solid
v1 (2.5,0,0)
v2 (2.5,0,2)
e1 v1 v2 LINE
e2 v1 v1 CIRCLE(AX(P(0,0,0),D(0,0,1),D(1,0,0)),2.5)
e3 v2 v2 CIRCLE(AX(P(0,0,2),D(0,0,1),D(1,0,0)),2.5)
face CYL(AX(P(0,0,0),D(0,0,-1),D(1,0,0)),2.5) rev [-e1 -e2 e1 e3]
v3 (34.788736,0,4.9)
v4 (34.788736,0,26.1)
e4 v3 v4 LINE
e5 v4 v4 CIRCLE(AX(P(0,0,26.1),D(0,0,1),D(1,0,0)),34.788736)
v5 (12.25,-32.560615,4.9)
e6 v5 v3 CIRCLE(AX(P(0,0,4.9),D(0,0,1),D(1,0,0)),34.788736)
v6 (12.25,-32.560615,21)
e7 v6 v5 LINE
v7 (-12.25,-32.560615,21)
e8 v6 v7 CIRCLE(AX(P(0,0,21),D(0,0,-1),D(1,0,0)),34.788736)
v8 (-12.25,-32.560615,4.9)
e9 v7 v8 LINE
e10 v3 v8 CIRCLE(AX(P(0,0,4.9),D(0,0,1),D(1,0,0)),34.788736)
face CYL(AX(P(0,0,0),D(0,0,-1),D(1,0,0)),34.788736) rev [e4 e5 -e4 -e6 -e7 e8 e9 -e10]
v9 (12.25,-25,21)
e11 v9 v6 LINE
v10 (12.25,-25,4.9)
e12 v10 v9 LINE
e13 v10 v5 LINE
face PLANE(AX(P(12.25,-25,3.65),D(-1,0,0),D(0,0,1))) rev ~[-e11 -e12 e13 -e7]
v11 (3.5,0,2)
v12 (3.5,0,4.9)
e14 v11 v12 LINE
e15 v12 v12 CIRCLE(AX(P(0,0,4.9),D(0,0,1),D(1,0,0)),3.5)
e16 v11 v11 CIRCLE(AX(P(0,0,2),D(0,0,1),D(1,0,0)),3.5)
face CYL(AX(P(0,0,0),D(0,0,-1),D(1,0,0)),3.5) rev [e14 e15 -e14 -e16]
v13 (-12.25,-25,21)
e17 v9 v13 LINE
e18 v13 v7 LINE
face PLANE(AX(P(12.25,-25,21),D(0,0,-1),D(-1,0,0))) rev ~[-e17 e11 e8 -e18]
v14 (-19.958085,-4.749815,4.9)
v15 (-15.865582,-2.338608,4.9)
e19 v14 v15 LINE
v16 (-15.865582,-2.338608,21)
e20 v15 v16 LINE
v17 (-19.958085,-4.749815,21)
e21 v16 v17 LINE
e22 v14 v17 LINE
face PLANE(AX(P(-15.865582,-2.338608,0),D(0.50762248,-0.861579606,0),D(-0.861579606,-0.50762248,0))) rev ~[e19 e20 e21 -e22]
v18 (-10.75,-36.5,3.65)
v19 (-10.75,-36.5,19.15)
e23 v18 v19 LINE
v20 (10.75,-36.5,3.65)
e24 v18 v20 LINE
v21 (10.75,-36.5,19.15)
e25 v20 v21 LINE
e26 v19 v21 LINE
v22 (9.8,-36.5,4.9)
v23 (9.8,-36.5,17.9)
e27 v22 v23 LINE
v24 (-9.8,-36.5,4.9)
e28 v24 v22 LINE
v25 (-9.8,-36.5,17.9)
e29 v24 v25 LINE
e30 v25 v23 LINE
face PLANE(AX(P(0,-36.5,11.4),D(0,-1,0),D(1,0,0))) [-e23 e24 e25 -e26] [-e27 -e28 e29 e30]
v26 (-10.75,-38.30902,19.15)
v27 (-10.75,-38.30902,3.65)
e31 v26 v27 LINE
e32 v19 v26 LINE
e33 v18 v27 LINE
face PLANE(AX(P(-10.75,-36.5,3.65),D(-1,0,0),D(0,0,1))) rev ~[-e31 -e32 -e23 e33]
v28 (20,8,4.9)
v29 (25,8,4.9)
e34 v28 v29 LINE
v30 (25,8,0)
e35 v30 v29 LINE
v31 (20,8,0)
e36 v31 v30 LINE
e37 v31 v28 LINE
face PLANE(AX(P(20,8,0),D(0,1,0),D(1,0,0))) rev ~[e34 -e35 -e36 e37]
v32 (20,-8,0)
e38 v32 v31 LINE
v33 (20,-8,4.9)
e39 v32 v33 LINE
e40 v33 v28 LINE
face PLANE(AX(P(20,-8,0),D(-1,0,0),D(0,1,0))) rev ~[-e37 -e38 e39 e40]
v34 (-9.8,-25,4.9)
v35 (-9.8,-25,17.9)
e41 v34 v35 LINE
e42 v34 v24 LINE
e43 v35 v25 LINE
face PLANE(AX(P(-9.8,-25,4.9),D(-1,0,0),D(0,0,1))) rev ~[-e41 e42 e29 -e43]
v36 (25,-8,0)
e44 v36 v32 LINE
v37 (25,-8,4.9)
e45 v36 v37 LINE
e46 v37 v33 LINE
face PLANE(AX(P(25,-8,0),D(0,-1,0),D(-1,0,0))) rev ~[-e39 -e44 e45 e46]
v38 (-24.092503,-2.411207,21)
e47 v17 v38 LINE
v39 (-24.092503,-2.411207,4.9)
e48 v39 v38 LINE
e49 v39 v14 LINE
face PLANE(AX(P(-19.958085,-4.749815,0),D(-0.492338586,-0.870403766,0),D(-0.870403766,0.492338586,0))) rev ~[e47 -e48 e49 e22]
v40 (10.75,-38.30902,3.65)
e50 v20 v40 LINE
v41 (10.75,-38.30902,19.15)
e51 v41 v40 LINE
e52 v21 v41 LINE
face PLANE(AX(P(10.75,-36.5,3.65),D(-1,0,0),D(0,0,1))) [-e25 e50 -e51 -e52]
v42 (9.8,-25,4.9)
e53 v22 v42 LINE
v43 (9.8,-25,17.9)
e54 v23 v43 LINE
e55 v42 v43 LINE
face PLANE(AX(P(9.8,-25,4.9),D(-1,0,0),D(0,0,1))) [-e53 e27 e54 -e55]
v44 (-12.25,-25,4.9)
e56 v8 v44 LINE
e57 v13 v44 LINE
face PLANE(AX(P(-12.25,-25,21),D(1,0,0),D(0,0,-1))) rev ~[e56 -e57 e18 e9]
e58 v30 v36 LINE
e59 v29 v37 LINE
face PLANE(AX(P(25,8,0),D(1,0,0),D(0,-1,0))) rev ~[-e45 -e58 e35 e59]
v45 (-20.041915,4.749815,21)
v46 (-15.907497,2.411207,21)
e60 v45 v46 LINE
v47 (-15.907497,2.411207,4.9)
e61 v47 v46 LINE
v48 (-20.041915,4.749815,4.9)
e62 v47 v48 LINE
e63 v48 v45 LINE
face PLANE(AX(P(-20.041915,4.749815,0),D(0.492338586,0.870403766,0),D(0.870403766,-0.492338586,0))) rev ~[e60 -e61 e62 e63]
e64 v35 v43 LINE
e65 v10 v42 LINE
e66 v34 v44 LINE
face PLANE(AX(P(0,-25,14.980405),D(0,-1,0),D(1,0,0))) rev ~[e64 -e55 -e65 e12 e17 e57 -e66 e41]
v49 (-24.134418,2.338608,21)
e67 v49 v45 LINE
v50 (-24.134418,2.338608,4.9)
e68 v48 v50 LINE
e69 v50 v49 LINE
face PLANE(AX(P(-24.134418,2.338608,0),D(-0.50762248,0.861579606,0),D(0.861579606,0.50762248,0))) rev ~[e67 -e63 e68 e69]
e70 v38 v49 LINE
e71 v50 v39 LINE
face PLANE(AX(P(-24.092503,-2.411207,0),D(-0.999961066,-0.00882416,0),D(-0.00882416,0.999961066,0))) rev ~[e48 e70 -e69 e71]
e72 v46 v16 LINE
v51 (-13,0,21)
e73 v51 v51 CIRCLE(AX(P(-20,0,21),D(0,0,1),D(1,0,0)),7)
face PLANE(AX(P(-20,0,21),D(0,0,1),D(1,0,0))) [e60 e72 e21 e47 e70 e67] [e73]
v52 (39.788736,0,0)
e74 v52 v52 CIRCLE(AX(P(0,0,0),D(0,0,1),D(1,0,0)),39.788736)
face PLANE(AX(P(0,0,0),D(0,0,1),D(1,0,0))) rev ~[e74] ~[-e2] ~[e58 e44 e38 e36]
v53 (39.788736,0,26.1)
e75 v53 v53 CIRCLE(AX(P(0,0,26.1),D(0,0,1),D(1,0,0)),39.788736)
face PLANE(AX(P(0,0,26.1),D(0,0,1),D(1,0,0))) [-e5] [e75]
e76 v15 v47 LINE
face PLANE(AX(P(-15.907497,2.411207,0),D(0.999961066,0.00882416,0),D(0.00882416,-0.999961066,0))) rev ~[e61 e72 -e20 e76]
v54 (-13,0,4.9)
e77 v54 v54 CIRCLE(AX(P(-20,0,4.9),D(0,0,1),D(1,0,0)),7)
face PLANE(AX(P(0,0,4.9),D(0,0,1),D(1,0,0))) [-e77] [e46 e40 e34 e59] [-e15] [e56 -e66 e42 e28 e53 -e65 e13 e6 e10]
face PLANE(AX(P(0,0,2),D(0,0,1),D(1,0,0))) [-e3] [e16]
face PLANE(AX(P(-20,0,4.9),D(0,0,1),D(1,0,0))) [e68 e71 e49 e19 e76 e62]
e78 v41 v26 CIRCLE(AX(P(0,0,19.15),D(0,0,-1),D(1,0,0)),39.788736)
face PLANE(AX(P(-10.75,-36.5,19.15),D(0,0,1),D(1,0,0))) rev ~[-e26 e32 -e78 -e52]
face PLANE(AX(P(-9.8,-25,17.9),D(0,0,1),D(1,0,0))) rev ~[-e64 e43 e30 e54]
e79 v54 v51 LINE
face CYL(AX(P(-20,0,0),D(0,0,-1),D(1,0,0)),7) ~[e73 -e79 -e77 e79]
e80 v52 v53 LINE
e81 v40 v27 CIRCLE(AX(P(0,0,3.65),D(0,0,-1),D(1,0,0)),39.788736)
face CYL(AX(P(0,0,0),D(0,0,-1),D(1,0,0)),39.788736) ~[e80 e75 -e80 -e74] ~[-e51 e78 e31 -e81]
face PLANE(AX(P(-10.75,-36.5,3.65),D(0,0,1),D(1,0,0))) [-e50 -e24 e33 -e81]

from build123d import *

# Parameters (mm, degrees)
F0_R     = 39.78873575
F0_R_2   = 34.78873575
F1_DEPTH = 26.1
F0_R_3   = 7
F0_R_4   = 3.5
F2_DEPTH = 4.9
F0_R_5   = 2.5
F3_DEPTH = 2
F4_DEPTH = 21
F6_START = 25
F5_W     = 19.6
F5_H     = 13
F6_DEPTH = 20
F7_START = 36.5
F5_W_2   = 21.5
F5_H_2   = 15.5
F7_DEPTH = 8.5
F8_START = 25
F8_DEPTH = 11.5
F9_START = 25
F9_DEPTH = 11.5


# Not quite as in the source:
# - a feature names something its author has since deleted; it is built from what else it names


with BuildPart() as f1:
    # F0 (on Top) → F1 (new body)
    with BuildSketch(Plane.XY):
        Circle(F0_R)
        Circle(F0_R_2, mode=Mode.SUBTRACT)
    extrude(amount=F1_DEPTH)

    # F0 (on Top) → F2 (join)
    with BuildSketch(Plane.XY):
        Circle(F0_R_2)
        with Locations((-20, 0)):
            Circle(F0_R_3, mode=Mode.SUBTRACT)
        Circle(F0_R_4, mode=Mode.SUBTRACT)
        Polygon((20, 4.1030999273), (20, 8), (25, 8), (25, 5), (25, -5), (25, -8), (20, -8), (20, -4.1030999273), align=None, mode=Mode.SUBTRACT)
    extrude(amount=F2_DEPTH)

    # F0 (on Top) → F3 (join)
    with BuildSketch(Plane.XY):
        Circle(F0_R_4)
        Circle(F0_R_5, mode=Mode.SUBTRACT)
    extrude(amount=F3_DEPTH)



with BuildPart() as f2:
    # F0 (on Top) → F2, piece 2 (new body)
    with BuildSketch(Plane.XY):
        Polygon((-24.1344178899, 2.3386082852), (-24.0925031294, -2.4112067799), (-19.9580852395, -4.7498150651), (-15.8655821101, -2.3386082852), (-15.9074968706, 2.4112067799), (-20.0419147605, 4.7498150651), align=None)
    extrude(amount=F2_DEPTH)


with BuildPart() as f1_1:
    add(f1.part)

    add(f2.part)  # F4 merges F2
    # F0 (on Top) → F4 (join)
    with BuildSketch(Plane.XY):
        with Locations((-20, 0)):
            Circle(F0_R_3)
        Polygon((-19.9580852395, -4.7498150651), (-24.0925031294, -2.4112067799), (-24.1344178899, 2.3386082852), (-20.0419147605, 4.7498150651), (-15.9074968706, 2.4112067799), (-15.8655821101, -2.3386082852), align=None, mode=Mode.SUBTRACT)
    extrude(amount=F4_DEPTH)

    # F5 (on Front) → F6 (cut)
    with BuildSketch(Plane.XZ.offset(F6_START)):
        with Locations((0, 11.4)):
            Rectangle(F5_W, F5_H)
    extrude(amount=F6_DEPTH, mode=Mode.SUBTRACT)

    # F5 (on Front) → F7 (cut)
    with BuildSketch(Plane.XZ.offset(F7_START)):
        with Locations((0, 11.4)):
            Rectangle(F5_W_2, F5_H_2)
        with Locations((0, 11.4)):
            Rectangle(F5_W, F5_H, mode=Mode.SUBTRACT)
    extrude(amount=F7_DEPTH, mode=Mode.SUBTRACT)

    # F5 (on Front) → F8 (join)
    with BuildSketch(Plane.XZ.offset(F8_START)):
        with Locations((0, 11.4)):
            Rectangle(F5_W_2, F5_H_2)
        with Locations((0, 11.4)):
            Rectangle(F5_W, F5_H, mode=Mode.SUBTRACT)
    extrude(amount=F8_DEPTH)

    # F5 (on Front) → F9 (join)
    with BuildSketch(Plane.XZ.offset(F9_START)):
        Polygon((-10.75, 3.65), (-10.75, 19.15), (10.75, 19.15), (10.75, 3.65), (12.25, 3.65), (12.25, 21), (-12.25, 21), (-12.25, 3.65), align=None)
    extrude(amount=F9_DEPTH)


solid = f1_1.part
